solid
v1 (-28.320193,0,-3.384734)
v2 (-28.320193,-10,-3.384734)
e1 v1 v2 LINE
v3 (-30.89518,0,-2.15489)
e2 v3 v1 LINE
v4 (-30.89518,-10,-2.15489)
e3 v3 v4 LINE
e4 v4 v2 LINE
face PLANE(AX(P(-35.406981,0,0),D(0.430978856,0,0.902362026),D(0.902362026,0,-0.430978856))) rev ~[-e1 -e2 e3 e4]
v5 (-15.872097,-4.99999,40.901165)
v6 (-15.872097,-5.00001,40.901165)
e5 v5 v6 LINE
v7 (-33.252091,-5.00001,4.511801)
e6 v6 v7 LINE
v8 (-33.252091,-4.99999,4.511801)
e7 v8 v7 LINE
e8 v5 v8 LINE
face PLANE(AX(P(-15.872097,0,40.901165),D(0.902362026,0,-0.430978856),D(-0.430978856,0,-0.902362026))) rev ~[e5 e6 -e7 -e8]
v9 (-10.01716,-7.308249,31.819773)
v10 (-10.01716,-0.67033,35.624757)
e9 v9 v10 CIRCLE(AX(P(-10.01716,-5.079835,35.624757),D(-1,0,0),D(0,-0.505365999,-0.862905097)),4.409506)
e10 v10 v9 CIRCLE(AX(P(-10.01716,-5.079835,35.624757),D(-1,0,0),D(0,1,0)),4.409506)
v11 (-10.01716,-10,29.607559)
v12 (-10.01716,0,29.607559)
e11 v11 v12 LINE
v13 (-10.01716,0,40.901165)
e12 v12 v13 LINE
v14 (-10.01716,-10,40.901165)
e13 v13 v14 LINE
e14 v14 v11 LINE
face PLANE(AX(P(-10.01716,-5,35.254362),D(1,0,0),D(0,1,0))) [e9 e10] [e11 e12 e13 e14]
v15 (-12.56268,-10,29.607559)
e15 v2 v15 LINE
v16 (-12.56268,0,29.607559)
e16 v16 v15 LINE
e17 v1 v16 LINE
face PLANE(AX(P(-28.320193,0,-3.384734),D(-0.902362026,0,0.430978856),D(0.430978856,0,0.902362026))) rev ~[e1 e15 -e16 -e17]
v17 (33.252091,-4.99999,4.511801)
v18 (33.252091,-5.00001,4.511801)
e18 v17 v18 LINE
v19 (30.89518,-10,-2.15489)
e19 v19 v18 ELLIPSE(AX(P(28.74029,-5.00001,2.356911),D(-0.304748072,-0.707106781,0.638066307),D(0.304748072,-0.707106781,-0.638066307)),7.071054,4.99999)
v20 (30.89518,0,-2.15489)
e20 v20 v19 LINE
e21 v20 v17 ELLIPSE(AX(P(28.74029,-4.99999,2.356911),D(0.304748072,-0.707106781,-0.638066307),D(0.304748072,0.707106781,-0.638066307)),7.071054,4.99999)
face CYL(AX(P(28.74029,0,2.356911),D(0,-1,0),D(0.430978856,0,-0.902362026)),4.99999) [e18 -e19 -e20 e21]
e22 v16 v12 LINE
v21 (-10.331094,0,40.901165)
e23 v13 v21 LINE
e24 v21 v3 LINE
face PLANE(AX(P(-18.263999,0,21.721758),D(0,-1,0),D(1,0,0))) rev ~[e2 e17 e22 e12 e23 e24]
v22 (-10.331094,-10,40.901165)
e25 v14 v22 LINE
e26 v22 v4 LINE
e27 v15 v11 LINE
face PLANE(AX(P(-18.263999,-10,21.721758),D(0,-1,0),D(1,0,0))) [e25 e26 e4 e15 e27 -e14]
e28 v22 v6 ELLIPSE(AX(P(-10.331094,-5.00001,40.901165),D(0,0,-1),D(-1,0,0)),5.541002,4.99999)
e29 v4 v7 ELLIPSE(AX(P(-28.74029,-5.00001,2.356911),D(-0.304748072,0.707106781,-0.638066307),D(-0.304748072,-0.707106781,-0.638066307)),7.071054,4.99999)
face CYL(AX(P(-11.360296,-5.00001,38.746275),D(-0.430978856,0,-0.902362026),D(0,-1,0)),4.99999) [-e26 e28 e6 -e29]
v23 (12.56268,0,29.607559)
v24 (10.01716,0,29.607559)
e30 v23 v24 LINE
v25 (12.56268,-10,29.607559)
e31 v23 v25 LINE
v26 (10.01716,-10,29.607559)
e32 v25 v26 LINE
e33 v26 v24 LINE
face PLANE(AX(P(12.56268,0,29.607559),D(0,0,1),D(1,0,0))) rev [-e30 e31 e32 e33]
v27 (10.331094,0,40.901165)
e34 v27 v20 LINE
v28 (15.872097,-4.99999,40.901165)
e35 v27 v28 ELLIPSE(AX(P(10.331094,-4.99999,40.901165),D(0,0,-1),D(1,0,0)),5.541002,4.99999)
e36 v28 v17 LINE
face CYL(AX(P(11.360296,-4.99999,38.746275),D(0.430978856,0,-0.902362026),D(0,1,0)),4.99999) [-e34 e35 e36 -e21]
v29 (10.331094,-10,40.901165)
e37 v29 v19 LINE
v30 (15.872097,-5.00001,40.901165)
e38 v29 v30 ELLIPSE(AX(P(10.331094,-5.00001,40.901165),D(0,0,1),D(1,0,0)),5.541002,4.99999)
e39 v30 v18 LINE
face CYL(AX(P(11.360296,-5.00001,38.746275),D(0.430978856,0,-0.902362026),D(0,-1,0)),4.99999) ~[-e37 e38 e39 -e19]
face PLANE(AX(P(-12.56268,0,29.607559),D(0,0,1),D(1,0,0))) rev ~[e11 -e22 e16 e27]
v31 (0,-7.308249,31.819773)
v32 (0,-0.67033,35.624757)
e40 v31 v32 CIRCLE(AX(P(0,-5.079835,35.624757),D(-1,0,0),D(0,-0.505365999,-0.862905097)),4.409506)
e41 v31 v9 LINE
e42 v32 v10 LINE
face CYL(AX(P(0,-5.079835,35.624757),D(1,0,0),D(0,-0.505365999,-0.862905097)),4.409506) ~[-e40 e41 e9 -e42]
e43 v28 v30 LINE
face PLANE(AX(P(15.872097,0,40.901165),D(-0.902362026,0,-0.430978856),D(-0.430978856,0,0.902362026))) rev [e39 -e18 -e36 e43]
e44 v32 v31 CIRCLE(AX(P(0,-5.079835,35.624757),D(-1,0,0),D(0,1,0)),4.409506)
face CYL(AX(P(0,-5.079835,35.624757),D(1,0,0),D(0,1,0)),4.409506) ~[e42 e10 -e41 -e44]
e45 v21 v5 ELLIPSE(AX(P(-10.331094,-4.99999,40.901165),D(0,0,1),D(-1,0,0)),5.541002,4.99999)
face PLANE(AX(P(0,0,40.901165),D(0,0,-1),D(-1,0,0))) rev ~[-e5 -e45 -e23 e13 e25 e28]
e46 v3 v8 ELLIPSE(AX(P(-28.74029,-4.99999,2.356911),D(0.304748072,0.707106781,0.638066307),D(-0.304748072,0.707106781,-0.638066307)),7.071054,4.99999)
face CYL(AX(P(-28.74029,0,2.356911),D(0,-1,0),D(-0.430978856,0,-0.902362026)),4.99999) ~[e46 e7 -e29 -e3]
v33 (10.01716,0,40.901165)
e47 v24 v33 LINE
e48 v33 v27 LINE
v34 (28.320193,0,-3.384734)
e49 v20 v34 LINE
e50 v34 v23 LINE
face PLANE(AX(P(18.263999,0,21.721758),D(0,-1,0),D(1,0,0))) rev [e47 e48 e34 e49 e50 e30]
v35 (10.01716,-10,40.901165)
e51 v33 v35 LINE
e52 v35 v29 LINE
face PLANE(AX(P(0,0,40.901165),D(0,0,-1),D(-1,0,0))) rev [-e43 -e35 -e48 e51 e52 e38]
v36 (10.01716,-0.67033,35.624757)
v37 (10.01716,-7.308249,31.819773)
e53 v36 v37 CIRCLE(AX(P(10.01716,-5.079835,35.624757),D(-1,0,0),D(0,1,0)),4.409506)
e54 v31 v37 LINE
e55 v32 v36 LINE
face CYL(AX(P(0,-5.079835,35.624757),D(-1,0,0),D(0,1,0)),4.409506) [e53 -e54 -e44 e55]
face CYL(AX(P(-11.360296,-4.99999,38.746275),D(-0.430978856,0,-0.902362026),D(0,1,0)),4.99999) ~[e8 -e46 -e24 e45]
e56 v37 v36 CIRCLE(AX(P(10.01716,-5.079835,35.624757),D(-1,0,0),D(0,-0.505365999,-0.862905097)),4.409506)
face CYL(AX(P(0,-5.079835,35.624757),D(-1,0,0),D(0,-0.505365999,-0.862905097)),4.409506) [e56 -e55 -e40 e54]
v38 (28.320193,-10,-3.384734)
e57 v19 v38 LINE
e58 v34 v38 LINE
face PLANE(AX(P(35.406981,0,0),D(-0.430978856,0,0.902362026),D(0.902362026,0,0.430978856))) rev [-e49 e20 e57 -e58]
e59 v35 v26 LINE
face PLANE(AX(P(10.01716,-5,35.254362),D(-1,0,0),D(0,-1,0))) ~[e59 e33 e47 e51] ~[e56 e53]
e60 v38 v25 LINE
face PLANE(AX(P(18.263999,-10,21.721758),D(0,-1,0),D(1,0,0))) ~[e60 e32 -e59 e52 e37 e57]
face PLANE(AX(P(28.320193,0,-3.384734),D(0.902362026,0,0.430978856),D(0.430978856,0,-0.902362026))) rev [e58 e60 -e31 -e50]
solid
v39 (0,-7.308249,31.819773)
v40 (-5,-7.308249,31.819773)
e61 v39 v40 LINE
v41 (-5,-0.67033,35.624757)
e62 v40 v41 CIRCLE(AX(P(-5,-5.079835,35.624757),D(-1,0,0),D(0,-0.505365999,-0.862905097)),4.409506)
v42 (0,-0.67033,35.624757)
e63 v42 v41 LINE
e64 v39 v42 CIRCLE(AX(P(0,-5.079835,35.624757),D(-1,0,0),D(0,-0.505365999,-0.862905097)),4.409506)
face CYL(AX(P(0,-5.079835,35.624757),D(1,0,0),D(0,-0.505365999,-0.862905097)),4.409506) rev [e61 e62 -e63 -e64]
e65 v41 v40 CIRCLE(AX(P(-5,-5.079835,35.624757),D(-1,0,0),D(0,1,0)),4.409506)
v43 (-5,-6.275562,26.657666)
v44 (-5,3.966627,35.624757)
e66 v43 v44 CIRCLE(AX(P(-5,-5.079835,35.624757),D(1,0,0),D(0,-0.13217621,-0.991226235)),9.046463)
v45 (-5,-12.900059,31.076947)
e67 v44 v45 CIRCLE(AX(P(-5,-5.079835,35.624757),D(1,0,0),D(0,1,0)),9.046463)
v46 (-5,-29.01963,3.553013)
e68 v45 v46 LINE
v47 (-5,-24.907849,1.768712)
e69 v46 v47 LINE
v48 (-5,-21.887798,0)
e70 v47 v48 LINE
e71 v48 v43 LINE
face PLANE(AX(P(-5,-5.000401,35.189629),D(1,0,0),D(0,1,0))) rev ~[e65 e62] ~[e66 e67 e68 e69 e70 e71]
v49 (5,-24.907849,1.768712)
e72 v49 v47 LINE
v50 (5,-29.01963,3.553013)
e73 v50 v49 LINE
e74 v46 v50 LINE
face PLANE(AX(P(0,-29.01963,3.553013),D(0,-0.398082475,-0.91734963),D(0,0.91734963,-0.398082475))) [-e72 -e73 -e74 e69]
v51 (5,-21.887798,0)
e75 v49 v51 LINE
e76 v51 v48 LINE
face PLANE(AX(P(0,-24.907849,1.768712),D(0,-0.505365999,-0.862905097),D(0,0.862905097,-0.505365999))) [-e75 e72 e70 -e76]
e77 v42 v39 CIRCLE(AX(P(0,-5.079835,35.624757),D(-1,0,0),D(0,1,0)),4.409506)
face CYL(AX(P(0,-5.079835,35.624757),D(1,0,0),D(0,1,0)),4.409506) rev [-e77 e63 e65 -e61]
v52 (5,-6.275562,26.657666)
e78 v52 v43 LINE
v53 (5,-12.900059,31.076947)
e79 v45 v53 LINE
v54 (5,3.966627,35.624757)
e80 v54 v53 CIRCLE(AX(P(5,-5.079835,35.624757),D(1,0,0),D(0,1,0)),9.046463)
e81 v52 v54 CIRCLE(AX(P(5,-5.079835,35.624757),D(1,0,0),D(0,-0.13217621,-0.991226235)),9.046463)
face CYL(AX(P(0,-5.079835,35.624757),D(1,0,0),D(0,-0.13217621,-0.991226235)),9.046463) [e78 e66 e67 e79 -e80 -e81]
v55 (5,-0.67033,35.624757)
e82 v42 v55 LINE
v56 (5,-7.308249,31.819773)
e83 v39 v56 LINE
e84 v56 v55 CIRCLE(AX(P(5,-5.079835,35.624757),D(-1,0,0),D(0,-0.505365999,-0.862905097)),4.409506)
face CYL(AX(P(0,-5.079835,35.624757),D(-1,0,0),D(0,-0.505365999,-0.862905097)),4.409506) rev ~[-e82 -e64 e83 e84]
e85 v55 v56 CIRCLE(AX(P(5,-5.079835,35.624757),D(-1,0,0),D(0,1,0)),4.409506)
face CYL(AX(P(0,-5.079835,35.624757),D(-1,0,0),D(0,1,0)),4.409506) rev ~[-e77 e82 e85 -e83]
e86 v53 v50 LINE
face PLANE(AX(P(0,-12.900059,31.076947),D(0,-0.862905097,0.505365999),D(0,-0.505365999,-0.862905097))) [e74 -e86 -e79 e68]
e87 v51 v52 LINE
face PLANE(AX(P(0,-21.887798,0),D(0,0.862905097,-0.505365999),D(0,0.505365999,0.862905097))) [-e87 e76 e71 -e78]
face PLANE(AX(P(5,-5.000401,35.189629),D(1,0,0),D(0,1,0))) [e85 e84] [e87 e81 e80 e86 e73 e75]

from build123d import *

# Parameters (mm, degrees)
F1_DEPTH = 10
F3_DEPTH = 10.01716
F4_R     = 4.99999
F6_DEPTH = 5


# Not quite as in the source:
# - a fillet or chamfer is up to 0.001 mm smaller than in the source, because OpenCascade refuses the exact size


with BuildPart() as f1:
    # F0 (on Front) → F1 (new body)
    with BuildSketch(Plane.XZ):
        Polygon((-12.5626804332, 29.607558623), (0, 29.607558623), (0, 40.9011654556), (-15.8720966429, 40.9011654556), (-35.4069806635, 0), (-28.3201927203, -3.3847343715), align=None)
    extrude(amount=F1_DEPTH)

    # F2 (on face) → F3 (cut)
    with BuildSketch(Plane.YZ):
        Polygon((-10, 29.607558623), (-8.6038469049, 29.607558623), (0, 29.607558623), (0, 40.9011654556), (-10, 40.9011654556), align=None)
        with BuildLine():
            ThreePointArc((-7.3082493459, 31.8197726236), (-7.2727253308, 39.4503255628), (-0.6703296735, 35.6247574091))
            ThreePointArc((-0.6703296735, 35.6247574091), (-2.8869450444, 31.7991892554), (-7.3082493459, 31.8197726236))
        make_face(mode=Mode.SUBTRACT)
    extrude(amount=-F3_DEPTH, mode=Mode.SUBTRACT)

    # F4 (radius 5 in the source; OpenCascade refuses exactly that, so slightly less here)
    f4_edges = [f1.edges().sort_by_distance(p)[0] for p in [
        (-25.639539, -10, 20.450583),
        (-25.639539, 0, 20.450583),
        (-35.406981, -5, 0),
    ]]
    fillet(f4_edges, radius=F4_R)

    # F5: F1 across face


with BuildPart() as f1_1:
    add(f1.part)
    add(f1.part.mirror(Plane(origin=(0, -5.0798351876, 35.6247574091), x_dir=(0, 1, 0), z_dir=(1, 0, 0))))


with BuildPart() as f6:
    # F2 (on face) → F6 (new body, symmetric)
    with BuildSketch(Plane.YZ):
        with BuildLine():
            ThreePointArc((-12.9000592681, 31.0769466924), (-11.4864525822, 29.2377596368), (-9.6516098344, 27.8185186501))
            ThreePointArc((-9.6516098344, 27.8185186501), (-8.0214187442, 27.0699007087), (-6.2755623418, 26.6576662667))
            ThreePointArc((-6.2755623418, 26.6576662667), (0.8792497216, 28.8183050271), (3.9666274903, 35.6247574091))
            ThreePointArc((3.9666274903, 35.6247574091), (-7.4349489542, 44.3592823607), (-12.9000592681, 31.0769466924))
        make_face()
        Polygon((0, 29.607558623), (-8.6038469049, 29.607558623), (-10, 29.607558623), (-10, 40.9011654556), (0, 40.9011654556), align=None, mode=Mode.SUBTRACT)
        with BuildLine():
            Line((-24.9078488827, 1.768712223), (-9.6516098344, 27.8185186501))
            ThreePointArc((-9.6516098344, 27.8185186501), (-11.4864525822, 29.2377596368), (-12.9000592681, 31.0769466924))
            Line((-12.9000592681, 31.0769466924), (-29.0196302747, 3.553013495))
            Line((-29.0196302747, 3.553013495), (-24.9078488827, 1.768712223))
        make_face()
        with BuildLine():
            ThreePointArc((-6.2755623418, 26.6576662667), (-8.0214187442, 27.0699007087), (-9.6516098344, 27.8185186501))
            Line((-9.6516098344, 27.8185186501), (-24.9078488827, 1.768712223))
            Line((-24.9078488827, 1.768712223), (-21.8877984701, 0))
            Line((-21.8877984701, 0), (-6.2755623418, 26.6576662667))
        make_face()
        Polygon((-10, 29.607558623), (-8.6038469049, 29.607558623), (0, 29.607558623), (0, 40.9011654556), (-10, 40.9011654556), align=None)
        with BuildLine():
            ThreePointArc((-7.3082493459, 31.8197726236), (-7.2727253308, 39.4503255628), (-0.6703296735, 35.6247574091))
            ThreePointArc((-0.6703296735, 35.6247574091), (-2.8869450444, 31.7991892554), (-7.3082493459, 31.8197726236))
        make_face(mode=Mode.SUBTRACT)
    extrude(amount=F6_DEPTH, both=True)


solid = Compound([f1_1.part, f6.part])
